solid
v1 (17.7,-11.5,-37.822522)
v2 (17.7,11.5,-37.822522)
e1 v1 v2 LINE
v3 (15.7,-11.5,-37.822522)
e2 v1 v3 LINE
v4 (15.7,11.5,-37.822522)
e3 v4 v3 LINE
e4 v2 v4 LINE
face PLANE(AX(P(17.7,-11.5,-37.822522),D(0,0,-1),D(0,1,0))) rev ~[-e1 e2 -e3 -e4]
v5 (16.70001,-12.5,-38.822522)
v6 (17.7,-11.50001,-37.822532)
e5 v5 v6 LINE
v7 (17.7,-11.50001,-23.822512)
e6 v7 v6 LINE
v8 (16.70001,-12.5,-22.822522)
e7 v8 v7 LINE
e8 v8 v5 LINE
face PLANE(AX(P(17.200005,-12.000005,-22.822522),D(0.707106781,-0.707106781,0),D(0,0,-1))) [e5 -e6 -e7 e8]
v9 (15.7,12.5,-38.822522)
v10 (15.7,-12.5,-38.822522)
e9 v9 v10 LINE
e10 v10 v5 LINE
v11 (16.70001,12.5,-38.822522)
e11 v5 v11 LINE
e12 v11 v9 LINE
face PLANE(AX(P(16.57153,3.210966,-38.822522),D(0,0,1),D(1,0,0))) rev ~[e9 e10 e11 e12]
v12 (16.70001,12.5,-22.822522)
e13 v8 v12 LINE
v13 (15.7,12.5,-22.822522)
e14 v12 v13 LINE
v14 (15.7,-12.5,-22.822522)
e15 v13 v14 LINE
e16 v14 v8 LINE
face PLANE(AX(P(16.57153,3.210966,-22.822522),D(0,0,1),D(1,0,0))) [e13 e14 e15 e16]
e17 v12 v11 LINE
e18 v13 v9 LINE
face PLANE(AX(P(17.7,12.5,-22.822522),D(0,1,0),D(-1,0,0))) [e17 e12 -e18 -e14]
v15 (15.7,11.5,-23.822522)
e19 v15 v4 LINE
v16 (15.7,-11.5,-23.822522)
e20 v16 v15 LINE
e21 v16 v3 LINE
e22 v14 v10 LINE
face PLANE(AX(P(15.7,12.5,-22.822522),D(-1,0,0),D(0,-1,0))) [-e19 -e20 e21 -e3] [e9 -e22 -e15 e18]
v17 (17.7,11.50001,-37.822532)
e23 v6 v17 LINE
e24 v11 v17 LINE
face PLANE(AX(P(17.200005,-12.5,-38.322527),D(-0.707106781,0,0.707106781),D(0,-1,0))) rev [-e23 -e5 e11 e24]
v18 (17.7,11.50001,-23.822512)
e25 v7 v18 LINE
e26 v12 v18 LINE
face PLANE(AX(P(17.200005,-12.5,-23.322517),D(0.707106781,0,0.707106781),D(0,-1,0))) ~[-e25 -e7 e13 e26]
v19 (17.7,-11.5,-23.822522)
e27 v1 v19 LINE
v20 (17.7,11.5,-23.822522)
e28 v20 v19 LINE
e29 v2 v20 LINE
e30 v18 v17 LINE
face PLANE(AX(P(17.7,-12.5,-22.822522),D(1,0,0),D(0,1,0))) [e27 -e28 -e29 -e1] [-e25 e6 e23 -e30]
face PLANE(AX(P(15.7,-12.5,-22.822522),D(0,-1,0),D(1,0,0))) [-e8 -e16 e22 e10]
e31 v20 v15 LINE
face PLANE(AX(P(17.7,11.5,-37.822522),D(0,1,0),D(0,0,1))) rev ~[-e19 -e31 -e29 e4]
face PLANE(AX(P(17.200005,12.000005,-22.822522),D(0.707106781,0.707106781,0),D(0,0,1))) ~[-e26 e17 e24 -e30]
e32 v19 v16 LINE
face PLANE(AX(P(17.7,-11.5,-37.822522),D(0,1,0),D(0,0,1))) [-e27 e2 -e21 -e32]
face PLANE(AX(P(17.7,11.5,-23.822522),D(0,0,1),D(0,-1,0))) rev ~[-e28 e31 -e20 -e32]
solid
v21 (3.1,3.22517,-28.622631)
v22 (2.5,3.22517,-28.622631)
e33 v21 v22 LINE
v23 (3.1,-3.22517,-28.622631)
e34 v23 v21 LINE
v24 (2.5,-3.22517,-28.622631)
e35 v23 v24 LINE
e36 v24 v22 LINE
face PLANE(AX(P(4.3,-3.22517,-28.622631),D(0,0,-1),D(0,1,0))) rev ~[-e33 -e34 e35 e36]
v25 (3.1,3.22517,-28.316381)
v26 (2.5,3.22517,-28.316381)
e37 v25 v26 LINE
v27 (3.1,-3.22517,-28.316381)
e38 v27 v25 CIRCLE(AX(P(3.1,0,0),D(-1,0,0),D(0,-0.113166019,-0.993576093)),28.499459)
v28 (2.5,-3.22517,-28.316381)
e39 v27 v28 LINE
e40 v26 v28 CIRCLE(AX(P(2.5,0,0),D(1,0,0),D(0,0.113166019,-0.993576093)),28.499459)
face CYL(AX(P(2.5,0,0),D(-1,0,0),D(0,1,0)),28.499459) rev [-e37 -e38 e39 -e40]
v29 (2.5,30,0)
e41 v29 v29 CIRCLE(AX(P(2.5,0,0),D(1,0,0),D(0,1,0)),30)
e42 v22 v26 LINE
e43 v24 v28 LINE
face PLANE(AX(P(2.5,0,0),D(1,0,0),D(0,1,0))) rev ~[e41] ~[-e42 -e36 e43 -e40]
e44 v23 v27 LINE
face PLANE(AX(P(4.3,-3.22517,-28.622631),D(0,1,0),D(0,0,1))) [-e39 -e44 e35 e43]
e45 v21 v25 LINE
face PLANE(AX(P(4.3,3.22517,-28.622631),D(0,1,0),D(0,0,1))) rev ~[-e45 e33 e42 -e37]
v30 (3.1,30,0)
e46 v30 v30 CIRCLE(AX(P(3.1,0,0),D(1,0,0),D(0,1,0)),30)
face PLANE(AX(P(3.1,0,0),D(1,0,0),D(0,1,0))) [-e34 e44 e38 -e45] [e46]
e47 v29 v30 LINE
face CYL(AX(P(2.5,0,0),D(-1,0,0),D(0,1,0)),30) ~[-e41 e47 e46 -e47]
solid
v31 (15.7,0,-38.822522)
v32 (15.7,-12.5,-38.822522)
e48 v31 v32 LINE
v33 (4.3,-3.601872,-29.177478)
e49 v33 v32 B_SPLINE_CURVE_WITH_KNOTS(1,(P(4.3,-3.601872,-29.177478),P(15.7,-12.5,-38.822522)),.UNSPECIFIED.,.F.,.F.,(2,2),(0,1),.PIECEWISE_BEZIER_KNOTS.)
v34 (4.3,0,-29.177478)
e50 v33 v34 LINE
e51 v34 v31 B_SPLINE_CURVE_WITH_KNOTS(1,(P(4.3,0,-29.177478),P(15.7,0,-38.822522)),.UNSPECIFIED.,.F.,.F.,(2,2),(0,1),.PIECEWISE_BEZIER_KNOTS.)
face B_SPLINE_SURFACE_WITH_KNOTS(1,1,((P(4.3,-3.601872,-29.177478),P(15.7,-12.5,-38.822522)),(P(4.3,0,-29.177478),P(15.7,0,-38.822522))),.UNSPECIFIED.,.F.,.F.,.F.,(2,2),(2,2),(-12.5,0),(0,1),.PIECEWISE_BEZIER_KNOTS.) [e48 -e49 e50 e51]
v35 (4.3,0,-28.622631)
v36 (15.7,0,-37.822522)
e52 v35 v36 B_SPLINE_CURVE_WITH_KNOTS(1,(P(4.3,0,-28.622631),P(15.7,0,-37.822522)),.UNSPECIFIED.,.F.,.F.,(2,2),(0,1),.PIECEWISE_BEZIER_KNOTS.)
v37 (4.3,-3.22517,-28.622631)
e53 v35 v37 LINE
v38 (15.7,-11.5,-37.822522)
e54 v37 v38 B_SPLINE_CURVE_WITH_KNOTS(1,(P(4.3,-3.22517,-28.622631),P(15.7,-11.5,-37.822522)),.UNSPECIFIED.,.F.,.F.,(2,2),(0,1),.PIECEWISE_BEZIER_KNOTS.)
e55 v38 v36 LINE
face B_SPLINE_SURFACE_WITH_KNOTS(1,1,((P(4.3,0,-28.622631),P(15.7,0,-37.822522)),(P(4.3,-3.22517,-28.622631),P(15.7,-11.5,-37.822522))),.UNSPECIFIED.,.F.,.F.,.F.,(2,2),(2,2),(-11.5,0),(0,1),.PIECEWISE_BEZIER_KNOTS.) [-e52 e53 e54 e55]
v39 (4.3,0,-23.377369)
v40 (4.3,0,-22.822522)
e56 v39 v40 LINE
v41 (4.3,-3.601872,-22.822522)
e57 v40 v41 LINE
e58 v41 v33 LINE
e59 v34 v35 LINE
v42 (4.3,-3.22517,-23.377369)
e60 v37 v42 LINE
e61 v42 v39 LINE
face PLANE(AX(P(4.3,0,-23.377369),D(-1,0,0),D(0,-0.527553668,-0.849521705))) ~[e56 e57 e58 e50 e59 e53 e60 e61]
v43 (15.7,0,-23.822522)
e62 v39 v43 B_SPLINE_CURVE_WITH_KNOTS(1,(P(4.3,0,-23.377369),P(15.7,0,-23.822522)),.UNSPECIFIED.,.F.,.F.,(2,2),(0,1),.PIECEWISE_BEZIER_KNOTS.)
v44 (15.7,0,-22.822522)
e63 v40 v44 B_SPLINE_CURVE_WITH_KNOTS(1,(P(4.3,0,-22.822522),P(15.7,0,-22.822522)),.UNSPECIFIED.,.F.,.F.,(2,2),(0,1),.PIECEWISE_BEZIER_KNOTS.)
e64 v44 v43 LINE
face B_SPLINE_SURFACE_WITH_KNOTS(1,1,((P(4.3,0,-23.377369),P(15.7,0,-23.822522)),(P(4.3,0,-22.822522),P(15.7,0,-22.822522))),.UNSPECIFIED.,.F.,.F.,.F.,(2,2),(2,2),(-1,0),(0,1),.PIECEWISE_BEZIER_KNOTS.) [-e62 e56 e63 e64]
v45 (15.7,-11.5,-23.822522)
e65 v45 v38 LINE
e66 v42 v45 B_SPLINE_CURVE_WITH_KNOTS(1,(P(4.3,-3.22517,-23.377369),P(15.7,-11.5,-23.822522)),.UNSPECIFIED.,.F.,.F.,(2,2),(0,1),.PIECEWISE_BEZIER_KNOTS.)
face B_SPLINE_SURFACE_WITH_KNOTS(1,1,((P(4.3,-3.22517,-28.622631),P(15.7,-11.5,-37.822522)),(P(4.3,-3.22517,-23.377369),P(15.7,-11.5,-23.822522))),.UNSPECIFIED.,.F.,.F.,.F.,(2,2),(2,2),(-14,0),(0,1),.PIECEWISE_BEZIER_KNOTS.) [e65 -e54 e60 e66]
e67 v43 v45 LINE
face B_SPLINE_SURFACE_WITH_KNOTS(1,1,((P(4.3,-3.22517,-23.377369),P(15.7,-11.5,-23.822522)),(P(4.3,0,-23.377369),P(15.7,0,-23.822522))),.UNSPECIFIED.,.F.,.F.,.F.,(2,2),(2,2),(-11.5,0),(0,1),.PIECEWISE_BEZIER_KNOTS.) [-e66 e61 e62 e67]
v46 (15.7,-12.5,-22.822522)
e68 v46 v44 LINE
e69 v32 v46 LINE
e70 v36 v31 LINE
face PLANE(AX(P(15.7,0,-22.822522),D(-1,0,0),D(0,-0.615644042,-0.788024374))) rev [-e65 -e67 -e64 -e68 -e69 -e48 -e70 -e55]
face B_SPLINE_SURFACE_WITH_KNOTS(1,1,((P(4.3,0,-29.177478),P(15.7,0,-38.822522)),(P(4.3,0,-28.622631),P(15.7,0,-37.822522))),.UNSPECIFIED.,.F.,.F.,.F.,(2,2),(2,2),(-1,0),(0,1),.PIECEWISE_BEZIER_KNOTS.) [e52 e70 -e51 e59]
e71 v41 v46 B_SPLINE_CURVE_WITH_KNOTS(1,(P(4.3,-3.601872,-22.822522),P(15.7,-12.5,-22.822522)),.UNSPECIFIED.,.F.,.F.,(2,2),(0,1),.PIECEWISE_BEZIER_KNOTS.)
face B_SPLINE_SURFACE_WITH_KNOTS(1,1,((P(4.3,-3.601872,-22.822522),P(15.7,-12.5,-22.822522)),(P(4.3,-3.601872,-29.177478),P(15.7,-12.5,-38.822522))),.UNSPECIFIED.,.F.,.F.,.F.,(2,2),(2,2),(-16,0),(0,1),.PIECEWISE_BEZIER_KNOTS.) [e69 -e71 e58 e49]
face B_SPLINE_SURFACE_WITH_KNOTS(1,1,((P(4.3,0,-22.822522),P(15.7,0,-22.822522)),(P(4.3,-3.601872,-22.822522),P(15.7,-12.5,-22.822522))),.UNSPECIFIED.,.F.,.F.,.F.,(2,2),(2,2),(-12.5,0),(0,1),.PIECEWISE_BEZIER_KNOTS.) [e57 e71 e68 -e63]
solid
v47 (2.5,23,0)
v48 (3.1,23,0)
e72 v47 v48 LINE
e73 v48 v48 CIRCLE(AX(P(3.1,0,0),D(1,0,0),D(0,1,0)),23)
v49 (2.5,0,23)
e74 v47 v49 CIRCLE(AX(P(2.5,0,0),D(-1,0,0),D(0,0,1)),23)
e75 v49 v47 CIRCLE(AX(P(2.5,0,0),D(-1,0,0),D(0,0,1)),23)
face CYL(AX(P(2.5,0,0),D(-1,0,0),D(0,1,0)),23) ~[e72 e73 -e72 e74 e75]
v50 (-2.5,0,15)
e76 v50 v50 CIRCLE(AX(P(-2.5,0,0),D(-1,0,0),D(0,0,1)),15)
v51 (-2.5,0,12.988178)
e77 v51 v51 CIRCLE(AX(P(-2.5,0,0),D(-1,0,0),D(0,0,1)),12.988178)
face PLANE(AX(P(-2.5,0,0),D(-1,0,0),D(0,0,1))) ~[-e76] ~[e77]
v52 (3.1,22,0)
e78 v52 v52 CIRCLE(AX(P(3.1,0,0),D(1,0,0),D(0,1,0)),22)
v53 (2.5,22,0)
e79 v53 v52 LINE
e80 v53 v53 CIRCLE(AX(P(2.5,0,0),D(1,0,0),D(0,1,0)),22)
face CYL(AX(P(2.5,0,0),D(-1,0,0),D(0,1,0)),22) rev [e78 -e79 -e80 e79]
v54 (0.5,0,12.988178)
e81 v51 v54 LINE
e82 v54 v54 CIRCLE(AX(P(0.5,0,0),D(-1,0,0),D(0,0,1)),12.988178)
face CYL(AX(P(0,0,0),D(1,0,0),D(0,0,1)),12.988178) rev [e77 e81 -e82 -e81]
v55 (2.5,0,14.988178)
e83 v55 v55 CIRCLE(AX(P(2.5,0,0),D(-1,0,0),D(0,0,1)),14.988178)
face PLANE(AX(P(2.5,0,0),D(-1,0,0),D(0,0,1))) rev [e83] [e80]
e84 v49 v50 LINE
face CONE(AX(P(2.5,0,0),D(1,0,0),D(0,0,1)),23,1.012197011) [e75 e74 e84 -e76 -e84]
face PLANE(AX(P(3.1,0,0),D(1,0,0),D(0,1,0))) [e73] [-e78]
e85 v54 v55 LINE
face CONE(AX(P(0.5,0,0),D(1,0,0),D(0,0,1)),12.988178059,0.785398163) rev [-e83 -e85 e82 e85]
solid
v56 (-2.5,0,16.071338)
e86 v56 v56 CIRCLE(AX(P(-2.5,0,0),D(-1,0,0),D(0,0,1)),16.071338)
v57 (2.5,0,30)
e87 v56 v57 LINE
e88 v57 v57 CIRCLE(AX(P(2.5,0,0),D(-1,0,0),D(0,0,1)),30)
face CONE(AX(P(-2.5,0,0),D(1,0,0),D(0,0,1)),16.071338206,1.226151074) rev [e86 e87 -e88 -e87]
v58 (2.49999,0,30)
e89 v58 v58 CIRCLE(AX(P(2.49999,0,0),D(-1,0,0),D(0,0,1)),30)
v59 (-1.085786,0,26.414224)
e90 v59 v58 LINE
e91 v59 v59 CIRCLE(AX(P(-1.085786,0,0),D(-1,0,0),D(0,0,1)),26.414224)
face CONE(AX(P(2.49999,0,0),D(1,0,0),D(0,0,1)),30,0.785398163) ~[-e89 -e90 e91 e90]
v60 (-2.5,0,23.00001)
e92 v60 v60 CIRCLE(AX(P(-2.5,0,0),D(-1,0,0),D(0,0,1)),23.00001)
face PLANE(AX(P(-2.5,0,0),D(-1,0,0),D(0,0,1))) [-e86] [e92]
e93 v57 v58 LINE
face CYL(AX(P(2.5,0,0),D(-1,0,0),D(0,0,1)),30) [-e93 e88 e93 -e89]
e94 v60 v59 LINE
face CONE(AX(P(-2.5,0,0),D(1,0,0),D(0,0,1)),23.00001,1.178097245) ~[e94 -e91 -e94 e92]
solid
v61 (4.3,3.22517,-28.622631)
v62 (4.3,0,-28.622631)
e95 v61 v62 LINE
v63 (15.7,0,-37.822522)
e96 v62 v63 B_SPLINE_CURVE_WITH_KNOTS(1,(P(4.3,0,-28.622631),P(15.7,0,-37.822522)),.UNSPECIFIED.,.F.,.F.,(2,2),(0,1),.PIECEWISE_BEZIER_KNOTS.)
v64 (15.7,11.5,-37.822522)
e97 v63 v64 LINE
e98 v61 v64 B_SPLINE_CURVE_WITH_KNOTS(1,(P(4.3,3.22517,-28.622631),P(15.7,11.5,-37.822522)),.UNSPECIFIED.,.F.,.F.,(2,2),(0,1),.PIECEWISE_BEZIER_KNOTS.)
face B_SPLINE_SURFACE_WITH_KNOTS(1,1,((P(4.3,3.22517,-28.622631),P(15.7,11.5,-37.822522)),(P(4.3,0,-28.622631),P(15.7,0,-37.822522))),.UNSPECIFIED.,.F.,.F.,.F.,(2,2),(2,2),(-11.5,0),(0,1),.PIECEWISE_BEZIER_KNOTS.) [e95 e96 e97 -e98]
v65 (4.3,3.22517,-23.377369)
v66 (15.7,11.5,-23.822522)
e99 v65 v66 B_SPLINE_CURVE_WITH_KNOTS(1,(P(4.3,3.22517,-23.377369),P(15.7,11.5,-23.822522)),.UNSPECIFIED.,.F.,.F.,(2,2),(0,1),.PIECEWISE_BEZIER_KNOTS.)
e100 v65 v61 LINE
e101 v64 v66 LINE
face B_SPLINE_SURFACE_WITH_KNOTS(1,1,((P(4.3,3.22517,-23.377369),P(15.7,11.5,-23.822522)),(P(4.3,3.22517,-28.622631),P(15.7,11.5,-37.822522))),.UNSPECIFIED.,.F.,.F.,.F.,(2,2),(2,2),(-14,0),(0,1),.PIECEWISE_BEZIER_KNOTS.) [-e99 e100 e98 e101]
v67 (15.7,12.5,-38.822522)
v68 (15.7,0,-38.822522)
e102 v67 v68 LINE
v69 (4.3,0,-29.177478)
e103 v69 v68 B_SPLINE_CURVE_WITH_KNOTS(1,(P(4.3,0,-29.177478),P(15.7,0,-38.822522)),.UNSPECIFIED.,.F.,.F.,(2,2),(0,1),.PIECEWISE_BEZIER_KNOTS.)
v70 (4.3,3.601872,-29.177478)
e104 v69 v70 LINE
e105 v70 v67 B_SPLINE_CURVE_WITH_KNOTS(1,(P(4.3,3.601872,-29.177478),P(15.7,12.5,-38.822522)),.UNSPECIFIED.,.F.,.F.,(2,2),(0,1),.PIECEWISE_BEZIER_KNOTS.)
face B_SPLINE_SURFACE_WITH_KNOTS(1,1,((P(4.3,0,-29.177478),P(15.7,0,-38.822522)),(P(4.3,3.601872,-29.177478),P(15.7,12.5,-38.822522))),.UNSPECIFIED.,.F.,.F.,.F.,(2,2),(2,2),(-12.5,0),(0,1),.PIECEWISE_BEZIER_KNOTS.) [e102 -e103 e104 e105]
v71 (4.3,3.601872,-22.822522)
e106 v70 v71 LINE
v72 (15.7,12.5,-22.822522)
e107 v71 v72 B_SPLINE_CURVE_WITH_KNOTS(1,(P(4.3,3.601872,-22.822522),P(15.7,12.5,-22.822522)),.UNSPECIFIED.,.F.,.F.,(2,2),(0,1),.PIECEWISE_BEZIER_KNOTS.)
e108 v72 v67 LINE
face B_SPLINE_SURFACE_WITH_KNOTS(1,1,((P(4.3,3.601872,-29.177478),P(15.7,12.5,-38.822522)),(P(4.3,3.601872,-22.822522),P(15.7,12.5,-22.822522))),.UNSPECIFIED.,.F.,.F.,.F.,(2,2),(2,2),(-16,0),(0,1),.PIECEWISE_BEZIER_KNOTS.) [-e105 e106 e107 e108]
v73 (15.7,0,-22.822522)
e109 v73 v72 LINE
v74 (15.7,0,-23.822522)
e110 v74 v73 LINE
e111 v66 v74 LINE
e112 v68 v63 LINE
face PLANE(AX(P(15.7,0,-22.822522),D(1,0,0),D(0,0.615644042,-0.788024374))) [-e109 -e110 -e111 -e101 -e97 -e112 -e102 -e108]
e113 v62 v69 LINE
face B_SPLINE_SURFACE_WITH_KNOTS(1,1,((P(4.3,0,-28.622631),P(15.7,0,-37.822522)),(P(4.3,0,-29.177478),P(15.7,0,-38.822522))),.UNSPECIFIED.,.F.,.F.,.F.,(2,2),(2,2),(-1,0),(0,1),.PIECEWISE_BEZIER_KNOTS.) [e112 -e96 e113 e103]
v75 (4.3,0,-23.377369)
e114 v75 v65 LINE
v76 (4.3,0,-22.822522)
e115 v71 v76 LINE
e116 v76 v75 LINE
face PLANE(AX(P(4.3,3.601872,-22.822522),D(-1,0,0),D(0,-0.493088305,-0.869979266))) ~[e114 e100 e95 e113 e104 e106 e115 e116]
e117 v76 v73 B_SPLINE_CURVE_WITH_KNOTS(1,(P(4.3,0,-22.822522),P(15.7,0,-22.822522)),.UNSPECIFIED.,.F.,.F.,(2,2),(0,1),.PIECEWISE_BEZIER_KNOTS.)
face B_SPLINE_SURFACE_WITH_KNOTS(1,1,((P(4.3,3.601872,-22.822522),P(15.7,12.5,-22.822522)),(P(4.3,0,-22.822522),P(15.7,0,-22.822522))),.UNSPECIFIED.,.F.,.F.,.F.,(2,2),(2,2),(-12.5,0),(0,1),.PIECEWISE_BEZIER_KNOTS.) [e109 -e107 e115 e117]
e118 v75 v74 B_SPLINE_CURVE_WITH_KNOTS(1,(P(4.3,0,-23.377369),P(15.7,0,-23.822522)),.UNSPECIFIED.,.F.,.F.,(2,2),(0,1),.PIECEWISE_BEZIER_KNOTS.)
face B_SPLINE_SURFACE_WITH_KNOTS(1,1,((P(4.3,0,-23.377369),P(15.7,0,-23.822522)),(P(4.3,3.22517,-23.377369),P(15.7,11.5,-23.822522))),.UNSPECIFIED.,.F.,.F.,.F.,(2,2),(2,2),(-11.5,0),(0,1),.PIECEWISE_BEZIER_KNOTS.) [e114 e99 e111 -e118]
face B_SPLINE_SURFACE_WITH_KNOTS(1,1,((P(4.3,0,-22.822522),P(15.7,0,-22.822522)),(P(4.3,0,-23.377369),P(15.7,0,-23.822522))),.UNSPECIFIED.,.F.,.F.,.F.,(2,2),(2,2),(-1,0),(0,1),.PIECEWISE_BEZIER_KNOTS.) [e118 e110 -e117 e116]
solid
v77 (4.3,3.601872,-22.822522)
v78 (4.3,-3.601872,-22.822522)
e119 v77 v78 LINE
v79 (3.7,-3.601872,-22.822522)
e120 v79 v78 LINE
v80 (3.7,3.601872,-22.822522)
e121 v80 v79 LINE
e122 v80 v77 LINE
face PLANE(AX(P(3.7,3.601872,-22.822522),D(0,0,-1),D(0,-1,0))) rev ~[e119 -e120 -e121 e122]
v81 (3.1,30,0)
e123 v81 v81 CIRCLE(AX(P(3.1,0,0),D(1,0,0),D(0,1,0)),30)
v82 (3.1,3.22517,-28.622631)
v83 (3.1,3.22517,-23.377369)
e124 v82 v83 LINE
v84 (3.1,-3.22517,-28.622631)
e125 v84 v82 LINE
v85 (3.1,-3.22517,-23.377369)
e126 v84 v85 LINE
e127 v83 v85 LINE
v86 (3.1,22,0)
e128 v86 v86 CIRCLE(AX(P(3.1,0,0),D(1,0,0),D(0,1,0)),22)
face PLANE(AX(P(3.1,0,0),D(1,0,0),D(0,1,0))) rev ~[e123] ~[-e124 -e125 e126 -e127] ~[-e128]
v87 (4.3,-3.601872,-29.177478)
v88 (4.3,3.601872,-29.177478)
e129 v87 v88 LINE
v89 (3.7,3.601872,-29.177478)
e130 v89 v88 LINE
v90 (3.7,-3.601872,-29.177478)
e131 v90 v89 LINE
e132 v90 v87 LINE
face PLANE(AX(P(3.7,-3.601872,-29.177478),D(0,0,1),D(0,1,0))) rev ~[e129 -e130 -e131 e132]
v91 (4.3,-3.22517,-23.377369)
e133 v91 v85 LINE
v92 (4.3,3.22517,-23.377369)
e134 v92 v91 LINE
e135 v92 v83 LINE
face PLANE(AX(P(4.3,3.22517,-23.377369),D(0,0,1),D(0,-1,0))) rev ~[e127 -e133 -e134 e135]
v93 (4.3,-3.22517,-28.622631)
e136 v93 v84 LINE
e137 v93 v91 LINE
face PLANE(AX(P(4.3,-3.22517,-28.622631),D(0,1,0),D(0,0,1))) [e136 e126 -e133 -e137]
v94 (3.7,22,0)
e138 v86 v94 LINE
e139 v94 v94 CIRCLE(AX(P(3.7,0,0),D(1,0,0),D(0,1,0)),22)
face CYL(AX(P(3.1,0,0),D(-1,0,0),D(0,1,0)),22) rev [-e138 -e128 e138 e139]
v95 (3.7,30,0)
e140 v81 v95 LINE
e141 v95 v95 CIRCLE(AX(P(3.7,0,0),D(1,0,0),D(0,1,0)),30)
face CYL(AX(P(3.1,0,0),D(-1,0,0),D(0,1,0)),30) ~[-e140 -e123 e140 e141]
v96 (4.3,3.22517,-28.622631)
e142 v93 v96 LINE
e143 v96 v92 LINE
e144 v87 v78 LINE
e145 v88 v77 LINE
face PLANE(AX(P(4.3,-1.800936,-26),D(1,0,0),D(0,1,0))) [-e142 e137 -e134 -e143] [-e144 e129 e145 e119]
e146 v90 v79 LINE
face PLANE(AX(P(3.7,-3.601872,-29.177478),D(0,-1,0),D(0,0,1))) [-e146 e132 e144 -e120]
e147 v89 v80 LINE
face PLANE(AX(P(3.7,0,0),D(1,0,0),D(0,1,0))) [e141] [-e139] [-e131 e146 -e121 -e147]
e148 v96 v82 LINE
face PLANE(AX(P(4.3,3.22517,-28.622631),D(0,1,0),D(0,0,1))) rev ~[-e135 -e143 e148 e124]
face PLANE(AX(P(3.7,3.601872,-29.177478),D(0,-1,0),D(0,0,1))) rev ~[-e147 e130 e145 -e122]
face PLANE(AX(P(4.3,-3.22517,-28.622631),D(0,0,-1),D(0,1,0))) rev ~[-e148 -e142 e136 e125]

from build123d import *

# Parameters (mm, degrees)
F0_W      = 5
F0_H      = 2.0118219405
F2_SIZE   = 4.99999
F3_SIZE   = 2
F4_SIZE   = 2
F5_R      = 23
F5_R_2    = 22
F6_DEPTH  = 0.6
F5_R_3    = 30
F5_R_4    = 28.4994588965
F7_R      = 30
F7_R_2    = 22
F8_DEPTH  = 0.6
F9_W      = 3.6018721294
F9_H      = 6.3549551666
F10_DEPTH = 0.6
F12_DEPTH = 16
F15_W     = 11.5
F15_H     = 14
F16_DEPTH = 25
F14_W     = 11.5
F14_H     = 14
F13_W     = 3.2251703087
F13_H     = 5.2452619672
F18_DEPTH = 25
F21_SIZE  = 0.99999


# Not quite as in the source:
# - a fillet or chamfer is up to 0.001 mm smaller than in the source, because OpenCascade refuses the exact size


with BuildPart() as f1:
    # F0 (on Front) → F1 (revolve)
    with BuildSketch(Plane.XZ):
        Polygon((-2.5, 30), (-2.5, 16.0713382065), (2.5, 30), align=None)
    revolve(axis=Axis((0, 0, 0), (-1, 0, 0)))

    # F2 (size 5 in the source; OpenCascade refuses exactly that, so slightly less here)
    f2_edges = [f1.edges().sort_by_distance(p)[0] for p in [
        (-2.5, 0, -30),
    ]]
    chamfer(f2_edges, length=F2_SIZE)

    # F4
    f4_edges = [f1.edges().sort_by_distance(p)[0] for p in [
        (-2.5, 0, -25.00001),
    ]]
    chamfer(f4_edges, length=F4_SIZE)

    # F14 (on face) → F17 section 0
    with BuildSketch(Plane(origin=(15.7, 0, 0), x_dir=(0, -1, 0), z_dir=(-1, 0, 0))):
        with Locations((5.75, -30.8225224167)):
            Rectangle(F14_W, F14_H)
    # F13 (on face) → F17 section 1
    with BuildSketch(Plane.YZ.offset(4.3)):
        with Locations((-1.6125851544, -26)):
            Rectangle(F13_W, F13_H)
    loft(mode=Mode.SUBTRACT)


with BuildPart() as f1b:
    # F0 (on Front) → F1, piece 2 (revolve)
    with BuildSketch(Plane.XZ):
        Polygon((2.5, 23), (-2.5, 15), (2.5, 15), align=None)
        with Locations((0, 13.9940890297)):
            Rectangle(F0_W, F0_H)
    revolve(axis=Axis((0, 0, 0), (-1, 0, 0)))

    # F3
    f3_edges = [f1b.edges().sort_by_distance(p)[0] for p in [
        (2.5, 0, -12.988178),
    ]]
    chamfer(f3_edges, length=F3_SIZE)

    # F5 (on face) → F6 (join)
    with BuildSketch(Plane.YZ.offset(2.5)):
        Circle(F5_R)
        Circle(F5_R_2, mode=Mode.SUBTRACT)
    extrude(amount=F6_DEPTH)


with BuildPart() as f6:
    # F5 (on face) → F6, piece 2 (new body)
    with BuildSketch(Plane.YZ.offset(2.5)):
        Circle(F5_R_3)
        Circle(F5_R_4, mode=Mode.SUBTRACT)
    extrude(amount=F6_DEPTH)


with BuildPart() as f8:
    # F7 (on face) → F8 (new body)
    with BuildSketch(Plane.YZ.offset(3.1)):
        Circle(F7_R)
        Circle(F7_R_2, mode=Mode.SUBTRACT)
    extrude(amount=F8_DEPTH)

    # F9 (on face) → F10 (join)
    with BuildSketch(Plane.YZ.offset(3.7)):
        with Locations((-1.8009360647, -26)):
            Rectangle(F9_W, F9_H)
        with Locations((1.8009360647, -26)):
            Rectangle(F9_W, F9_H)
    extrude(amount=F10_DEPTH)


with BuildPart() as f12:
    # F11 (on face) → F12 (new body)
    with BuildSketch(Plane.XY.offset(-22.8225224167)):
        Polygon((15.7, -6.078068167), (17.4430608749, -6.078068167), (17.4430608749, 12.5), (15.7, 12.5), (15.7, 0), align=None)
        Polygon((17.4430608749, 12.5), (17.4430608749, -6.078068167), (15.7, -6.078068167), (15.7, -12.5), (17.7, -12.5), (17.7, 12.5), align=None)
    extrude(amount=-F12_DEPTH)

    # F15 (on face) → F16 (cut)
    with BuildSketch(Plane.YZ.offset(17.7)):
        with Locations((5.75, -30.8225224167)):
            Rectangle(F15_W, F15_H)
        with Locations((-5.75, -30.8225224167)):
            Rectangle(F15_W, F15_H)
    extrude(amount=-F16_DEPTH, mode=Mode.SUBTRACT)

    # F21 (size 1 in the source; OpenCascade refuses exactly that, so slightly less here)
    f21_edges = [f12.edges().sort_by_distance(p)[0] for p in [
        (17.7, 0, -22.822522),
        (17.7, 0, -38.822522),
        (17.7, -12.5, -30.822522),
        (17.7, 12.5, -30.822522),
    ]]
    chamfer(f21_edges, length=F21_SIZE)


with BuildPart() as f18_tool:
    # F13 (on face) → F18 (new body)
    with BuildSketch(Plane.YZ.offset(4.3)):
        with Locations((-1.6125851544, -26)):
            Rectangle(F13_W, F13_H)
        with Locations((1.6125851544, -26)):
            Rectangle(F13_W, F13_H)
    extrude(amount=-F18_DEPTH)


with BuildPart() as f6_1:
    add(f6.part)

    # F18: cut by f18_tool
    add(f18_tool.part, mode=Mode.SUBTRACT)


with BuildPart() as f8_1:
    add(f8.part)

    # F18: cut by f18_tool
    add(f18_tool.part, mode=Mode.SUBTRACT)


with BuildPart() as f19:
    # F13 (on face) → F19 section 0
    with BuildSketch(Plane.YZ.offset(4.3)):
        Polygon((0, -23.3773690164), (0, -22.8225224167), (-3.6018721294, -22.8225224167), (-3.6018721294, -29.1774775833), (0, -29.1774775833), (0, -28.6226309836), (-3.2251703087, -28.6226309836), (-3.2251703087, -23.3773690164), align=None)
    # F14 (on face) → F19 section 1
    with BuildSketch(Plane(origin=(15.7, 0, 0), x_dir=(0, -1, 0), z_dir=(-1, 0, 0))):
        Polygon((0, -37.8225224167), (0, -38.8225224167), (12.5, -38.8225224167), (12.5, -22.8225224167), (0, -22.8225224167), (0, -23.8225224167), (11.5, -23.8225224167), (11.5, -37.8225224167), align=None)
    loft()


with BuildPart() as f20:
    # F13 (on face) → F20 section 0
    with BuildSketch(Plane.YZ.offset(4.3)):
        Polygon((3.6018721294, -22.8225224167), (0, -22.8225224167), (0, -23.3773690164), (3.2251703087, -23.3773690164), (3.2251703087, -28.6226309836), (0, -28.6226309836), (0, -29.1774775833), (3.6018721294, -29.1774775833), align=None)
    # F14 (on face) → F20 section 1
    with BuildSketch(Plane(origin=(15.7, 0, 0), x_dir=(0, -1, 0), z_dir=(-1, 0, 0))):
        Polygon((-12.5, -38.8225224167), (0, -38.8225224167), (0, -37.8225224167), (-11.5, -37.8225224167), (-11.5, -23.8225224167), (0, -23.8225224167), (0, -22.8225224167), (-12.5, -22.8225224167), align=None)
    loft()


solid = Compound([f1.part, f1b.part, f12.part, f6_1.part, f8_1.part, f19.part, f20.part])
